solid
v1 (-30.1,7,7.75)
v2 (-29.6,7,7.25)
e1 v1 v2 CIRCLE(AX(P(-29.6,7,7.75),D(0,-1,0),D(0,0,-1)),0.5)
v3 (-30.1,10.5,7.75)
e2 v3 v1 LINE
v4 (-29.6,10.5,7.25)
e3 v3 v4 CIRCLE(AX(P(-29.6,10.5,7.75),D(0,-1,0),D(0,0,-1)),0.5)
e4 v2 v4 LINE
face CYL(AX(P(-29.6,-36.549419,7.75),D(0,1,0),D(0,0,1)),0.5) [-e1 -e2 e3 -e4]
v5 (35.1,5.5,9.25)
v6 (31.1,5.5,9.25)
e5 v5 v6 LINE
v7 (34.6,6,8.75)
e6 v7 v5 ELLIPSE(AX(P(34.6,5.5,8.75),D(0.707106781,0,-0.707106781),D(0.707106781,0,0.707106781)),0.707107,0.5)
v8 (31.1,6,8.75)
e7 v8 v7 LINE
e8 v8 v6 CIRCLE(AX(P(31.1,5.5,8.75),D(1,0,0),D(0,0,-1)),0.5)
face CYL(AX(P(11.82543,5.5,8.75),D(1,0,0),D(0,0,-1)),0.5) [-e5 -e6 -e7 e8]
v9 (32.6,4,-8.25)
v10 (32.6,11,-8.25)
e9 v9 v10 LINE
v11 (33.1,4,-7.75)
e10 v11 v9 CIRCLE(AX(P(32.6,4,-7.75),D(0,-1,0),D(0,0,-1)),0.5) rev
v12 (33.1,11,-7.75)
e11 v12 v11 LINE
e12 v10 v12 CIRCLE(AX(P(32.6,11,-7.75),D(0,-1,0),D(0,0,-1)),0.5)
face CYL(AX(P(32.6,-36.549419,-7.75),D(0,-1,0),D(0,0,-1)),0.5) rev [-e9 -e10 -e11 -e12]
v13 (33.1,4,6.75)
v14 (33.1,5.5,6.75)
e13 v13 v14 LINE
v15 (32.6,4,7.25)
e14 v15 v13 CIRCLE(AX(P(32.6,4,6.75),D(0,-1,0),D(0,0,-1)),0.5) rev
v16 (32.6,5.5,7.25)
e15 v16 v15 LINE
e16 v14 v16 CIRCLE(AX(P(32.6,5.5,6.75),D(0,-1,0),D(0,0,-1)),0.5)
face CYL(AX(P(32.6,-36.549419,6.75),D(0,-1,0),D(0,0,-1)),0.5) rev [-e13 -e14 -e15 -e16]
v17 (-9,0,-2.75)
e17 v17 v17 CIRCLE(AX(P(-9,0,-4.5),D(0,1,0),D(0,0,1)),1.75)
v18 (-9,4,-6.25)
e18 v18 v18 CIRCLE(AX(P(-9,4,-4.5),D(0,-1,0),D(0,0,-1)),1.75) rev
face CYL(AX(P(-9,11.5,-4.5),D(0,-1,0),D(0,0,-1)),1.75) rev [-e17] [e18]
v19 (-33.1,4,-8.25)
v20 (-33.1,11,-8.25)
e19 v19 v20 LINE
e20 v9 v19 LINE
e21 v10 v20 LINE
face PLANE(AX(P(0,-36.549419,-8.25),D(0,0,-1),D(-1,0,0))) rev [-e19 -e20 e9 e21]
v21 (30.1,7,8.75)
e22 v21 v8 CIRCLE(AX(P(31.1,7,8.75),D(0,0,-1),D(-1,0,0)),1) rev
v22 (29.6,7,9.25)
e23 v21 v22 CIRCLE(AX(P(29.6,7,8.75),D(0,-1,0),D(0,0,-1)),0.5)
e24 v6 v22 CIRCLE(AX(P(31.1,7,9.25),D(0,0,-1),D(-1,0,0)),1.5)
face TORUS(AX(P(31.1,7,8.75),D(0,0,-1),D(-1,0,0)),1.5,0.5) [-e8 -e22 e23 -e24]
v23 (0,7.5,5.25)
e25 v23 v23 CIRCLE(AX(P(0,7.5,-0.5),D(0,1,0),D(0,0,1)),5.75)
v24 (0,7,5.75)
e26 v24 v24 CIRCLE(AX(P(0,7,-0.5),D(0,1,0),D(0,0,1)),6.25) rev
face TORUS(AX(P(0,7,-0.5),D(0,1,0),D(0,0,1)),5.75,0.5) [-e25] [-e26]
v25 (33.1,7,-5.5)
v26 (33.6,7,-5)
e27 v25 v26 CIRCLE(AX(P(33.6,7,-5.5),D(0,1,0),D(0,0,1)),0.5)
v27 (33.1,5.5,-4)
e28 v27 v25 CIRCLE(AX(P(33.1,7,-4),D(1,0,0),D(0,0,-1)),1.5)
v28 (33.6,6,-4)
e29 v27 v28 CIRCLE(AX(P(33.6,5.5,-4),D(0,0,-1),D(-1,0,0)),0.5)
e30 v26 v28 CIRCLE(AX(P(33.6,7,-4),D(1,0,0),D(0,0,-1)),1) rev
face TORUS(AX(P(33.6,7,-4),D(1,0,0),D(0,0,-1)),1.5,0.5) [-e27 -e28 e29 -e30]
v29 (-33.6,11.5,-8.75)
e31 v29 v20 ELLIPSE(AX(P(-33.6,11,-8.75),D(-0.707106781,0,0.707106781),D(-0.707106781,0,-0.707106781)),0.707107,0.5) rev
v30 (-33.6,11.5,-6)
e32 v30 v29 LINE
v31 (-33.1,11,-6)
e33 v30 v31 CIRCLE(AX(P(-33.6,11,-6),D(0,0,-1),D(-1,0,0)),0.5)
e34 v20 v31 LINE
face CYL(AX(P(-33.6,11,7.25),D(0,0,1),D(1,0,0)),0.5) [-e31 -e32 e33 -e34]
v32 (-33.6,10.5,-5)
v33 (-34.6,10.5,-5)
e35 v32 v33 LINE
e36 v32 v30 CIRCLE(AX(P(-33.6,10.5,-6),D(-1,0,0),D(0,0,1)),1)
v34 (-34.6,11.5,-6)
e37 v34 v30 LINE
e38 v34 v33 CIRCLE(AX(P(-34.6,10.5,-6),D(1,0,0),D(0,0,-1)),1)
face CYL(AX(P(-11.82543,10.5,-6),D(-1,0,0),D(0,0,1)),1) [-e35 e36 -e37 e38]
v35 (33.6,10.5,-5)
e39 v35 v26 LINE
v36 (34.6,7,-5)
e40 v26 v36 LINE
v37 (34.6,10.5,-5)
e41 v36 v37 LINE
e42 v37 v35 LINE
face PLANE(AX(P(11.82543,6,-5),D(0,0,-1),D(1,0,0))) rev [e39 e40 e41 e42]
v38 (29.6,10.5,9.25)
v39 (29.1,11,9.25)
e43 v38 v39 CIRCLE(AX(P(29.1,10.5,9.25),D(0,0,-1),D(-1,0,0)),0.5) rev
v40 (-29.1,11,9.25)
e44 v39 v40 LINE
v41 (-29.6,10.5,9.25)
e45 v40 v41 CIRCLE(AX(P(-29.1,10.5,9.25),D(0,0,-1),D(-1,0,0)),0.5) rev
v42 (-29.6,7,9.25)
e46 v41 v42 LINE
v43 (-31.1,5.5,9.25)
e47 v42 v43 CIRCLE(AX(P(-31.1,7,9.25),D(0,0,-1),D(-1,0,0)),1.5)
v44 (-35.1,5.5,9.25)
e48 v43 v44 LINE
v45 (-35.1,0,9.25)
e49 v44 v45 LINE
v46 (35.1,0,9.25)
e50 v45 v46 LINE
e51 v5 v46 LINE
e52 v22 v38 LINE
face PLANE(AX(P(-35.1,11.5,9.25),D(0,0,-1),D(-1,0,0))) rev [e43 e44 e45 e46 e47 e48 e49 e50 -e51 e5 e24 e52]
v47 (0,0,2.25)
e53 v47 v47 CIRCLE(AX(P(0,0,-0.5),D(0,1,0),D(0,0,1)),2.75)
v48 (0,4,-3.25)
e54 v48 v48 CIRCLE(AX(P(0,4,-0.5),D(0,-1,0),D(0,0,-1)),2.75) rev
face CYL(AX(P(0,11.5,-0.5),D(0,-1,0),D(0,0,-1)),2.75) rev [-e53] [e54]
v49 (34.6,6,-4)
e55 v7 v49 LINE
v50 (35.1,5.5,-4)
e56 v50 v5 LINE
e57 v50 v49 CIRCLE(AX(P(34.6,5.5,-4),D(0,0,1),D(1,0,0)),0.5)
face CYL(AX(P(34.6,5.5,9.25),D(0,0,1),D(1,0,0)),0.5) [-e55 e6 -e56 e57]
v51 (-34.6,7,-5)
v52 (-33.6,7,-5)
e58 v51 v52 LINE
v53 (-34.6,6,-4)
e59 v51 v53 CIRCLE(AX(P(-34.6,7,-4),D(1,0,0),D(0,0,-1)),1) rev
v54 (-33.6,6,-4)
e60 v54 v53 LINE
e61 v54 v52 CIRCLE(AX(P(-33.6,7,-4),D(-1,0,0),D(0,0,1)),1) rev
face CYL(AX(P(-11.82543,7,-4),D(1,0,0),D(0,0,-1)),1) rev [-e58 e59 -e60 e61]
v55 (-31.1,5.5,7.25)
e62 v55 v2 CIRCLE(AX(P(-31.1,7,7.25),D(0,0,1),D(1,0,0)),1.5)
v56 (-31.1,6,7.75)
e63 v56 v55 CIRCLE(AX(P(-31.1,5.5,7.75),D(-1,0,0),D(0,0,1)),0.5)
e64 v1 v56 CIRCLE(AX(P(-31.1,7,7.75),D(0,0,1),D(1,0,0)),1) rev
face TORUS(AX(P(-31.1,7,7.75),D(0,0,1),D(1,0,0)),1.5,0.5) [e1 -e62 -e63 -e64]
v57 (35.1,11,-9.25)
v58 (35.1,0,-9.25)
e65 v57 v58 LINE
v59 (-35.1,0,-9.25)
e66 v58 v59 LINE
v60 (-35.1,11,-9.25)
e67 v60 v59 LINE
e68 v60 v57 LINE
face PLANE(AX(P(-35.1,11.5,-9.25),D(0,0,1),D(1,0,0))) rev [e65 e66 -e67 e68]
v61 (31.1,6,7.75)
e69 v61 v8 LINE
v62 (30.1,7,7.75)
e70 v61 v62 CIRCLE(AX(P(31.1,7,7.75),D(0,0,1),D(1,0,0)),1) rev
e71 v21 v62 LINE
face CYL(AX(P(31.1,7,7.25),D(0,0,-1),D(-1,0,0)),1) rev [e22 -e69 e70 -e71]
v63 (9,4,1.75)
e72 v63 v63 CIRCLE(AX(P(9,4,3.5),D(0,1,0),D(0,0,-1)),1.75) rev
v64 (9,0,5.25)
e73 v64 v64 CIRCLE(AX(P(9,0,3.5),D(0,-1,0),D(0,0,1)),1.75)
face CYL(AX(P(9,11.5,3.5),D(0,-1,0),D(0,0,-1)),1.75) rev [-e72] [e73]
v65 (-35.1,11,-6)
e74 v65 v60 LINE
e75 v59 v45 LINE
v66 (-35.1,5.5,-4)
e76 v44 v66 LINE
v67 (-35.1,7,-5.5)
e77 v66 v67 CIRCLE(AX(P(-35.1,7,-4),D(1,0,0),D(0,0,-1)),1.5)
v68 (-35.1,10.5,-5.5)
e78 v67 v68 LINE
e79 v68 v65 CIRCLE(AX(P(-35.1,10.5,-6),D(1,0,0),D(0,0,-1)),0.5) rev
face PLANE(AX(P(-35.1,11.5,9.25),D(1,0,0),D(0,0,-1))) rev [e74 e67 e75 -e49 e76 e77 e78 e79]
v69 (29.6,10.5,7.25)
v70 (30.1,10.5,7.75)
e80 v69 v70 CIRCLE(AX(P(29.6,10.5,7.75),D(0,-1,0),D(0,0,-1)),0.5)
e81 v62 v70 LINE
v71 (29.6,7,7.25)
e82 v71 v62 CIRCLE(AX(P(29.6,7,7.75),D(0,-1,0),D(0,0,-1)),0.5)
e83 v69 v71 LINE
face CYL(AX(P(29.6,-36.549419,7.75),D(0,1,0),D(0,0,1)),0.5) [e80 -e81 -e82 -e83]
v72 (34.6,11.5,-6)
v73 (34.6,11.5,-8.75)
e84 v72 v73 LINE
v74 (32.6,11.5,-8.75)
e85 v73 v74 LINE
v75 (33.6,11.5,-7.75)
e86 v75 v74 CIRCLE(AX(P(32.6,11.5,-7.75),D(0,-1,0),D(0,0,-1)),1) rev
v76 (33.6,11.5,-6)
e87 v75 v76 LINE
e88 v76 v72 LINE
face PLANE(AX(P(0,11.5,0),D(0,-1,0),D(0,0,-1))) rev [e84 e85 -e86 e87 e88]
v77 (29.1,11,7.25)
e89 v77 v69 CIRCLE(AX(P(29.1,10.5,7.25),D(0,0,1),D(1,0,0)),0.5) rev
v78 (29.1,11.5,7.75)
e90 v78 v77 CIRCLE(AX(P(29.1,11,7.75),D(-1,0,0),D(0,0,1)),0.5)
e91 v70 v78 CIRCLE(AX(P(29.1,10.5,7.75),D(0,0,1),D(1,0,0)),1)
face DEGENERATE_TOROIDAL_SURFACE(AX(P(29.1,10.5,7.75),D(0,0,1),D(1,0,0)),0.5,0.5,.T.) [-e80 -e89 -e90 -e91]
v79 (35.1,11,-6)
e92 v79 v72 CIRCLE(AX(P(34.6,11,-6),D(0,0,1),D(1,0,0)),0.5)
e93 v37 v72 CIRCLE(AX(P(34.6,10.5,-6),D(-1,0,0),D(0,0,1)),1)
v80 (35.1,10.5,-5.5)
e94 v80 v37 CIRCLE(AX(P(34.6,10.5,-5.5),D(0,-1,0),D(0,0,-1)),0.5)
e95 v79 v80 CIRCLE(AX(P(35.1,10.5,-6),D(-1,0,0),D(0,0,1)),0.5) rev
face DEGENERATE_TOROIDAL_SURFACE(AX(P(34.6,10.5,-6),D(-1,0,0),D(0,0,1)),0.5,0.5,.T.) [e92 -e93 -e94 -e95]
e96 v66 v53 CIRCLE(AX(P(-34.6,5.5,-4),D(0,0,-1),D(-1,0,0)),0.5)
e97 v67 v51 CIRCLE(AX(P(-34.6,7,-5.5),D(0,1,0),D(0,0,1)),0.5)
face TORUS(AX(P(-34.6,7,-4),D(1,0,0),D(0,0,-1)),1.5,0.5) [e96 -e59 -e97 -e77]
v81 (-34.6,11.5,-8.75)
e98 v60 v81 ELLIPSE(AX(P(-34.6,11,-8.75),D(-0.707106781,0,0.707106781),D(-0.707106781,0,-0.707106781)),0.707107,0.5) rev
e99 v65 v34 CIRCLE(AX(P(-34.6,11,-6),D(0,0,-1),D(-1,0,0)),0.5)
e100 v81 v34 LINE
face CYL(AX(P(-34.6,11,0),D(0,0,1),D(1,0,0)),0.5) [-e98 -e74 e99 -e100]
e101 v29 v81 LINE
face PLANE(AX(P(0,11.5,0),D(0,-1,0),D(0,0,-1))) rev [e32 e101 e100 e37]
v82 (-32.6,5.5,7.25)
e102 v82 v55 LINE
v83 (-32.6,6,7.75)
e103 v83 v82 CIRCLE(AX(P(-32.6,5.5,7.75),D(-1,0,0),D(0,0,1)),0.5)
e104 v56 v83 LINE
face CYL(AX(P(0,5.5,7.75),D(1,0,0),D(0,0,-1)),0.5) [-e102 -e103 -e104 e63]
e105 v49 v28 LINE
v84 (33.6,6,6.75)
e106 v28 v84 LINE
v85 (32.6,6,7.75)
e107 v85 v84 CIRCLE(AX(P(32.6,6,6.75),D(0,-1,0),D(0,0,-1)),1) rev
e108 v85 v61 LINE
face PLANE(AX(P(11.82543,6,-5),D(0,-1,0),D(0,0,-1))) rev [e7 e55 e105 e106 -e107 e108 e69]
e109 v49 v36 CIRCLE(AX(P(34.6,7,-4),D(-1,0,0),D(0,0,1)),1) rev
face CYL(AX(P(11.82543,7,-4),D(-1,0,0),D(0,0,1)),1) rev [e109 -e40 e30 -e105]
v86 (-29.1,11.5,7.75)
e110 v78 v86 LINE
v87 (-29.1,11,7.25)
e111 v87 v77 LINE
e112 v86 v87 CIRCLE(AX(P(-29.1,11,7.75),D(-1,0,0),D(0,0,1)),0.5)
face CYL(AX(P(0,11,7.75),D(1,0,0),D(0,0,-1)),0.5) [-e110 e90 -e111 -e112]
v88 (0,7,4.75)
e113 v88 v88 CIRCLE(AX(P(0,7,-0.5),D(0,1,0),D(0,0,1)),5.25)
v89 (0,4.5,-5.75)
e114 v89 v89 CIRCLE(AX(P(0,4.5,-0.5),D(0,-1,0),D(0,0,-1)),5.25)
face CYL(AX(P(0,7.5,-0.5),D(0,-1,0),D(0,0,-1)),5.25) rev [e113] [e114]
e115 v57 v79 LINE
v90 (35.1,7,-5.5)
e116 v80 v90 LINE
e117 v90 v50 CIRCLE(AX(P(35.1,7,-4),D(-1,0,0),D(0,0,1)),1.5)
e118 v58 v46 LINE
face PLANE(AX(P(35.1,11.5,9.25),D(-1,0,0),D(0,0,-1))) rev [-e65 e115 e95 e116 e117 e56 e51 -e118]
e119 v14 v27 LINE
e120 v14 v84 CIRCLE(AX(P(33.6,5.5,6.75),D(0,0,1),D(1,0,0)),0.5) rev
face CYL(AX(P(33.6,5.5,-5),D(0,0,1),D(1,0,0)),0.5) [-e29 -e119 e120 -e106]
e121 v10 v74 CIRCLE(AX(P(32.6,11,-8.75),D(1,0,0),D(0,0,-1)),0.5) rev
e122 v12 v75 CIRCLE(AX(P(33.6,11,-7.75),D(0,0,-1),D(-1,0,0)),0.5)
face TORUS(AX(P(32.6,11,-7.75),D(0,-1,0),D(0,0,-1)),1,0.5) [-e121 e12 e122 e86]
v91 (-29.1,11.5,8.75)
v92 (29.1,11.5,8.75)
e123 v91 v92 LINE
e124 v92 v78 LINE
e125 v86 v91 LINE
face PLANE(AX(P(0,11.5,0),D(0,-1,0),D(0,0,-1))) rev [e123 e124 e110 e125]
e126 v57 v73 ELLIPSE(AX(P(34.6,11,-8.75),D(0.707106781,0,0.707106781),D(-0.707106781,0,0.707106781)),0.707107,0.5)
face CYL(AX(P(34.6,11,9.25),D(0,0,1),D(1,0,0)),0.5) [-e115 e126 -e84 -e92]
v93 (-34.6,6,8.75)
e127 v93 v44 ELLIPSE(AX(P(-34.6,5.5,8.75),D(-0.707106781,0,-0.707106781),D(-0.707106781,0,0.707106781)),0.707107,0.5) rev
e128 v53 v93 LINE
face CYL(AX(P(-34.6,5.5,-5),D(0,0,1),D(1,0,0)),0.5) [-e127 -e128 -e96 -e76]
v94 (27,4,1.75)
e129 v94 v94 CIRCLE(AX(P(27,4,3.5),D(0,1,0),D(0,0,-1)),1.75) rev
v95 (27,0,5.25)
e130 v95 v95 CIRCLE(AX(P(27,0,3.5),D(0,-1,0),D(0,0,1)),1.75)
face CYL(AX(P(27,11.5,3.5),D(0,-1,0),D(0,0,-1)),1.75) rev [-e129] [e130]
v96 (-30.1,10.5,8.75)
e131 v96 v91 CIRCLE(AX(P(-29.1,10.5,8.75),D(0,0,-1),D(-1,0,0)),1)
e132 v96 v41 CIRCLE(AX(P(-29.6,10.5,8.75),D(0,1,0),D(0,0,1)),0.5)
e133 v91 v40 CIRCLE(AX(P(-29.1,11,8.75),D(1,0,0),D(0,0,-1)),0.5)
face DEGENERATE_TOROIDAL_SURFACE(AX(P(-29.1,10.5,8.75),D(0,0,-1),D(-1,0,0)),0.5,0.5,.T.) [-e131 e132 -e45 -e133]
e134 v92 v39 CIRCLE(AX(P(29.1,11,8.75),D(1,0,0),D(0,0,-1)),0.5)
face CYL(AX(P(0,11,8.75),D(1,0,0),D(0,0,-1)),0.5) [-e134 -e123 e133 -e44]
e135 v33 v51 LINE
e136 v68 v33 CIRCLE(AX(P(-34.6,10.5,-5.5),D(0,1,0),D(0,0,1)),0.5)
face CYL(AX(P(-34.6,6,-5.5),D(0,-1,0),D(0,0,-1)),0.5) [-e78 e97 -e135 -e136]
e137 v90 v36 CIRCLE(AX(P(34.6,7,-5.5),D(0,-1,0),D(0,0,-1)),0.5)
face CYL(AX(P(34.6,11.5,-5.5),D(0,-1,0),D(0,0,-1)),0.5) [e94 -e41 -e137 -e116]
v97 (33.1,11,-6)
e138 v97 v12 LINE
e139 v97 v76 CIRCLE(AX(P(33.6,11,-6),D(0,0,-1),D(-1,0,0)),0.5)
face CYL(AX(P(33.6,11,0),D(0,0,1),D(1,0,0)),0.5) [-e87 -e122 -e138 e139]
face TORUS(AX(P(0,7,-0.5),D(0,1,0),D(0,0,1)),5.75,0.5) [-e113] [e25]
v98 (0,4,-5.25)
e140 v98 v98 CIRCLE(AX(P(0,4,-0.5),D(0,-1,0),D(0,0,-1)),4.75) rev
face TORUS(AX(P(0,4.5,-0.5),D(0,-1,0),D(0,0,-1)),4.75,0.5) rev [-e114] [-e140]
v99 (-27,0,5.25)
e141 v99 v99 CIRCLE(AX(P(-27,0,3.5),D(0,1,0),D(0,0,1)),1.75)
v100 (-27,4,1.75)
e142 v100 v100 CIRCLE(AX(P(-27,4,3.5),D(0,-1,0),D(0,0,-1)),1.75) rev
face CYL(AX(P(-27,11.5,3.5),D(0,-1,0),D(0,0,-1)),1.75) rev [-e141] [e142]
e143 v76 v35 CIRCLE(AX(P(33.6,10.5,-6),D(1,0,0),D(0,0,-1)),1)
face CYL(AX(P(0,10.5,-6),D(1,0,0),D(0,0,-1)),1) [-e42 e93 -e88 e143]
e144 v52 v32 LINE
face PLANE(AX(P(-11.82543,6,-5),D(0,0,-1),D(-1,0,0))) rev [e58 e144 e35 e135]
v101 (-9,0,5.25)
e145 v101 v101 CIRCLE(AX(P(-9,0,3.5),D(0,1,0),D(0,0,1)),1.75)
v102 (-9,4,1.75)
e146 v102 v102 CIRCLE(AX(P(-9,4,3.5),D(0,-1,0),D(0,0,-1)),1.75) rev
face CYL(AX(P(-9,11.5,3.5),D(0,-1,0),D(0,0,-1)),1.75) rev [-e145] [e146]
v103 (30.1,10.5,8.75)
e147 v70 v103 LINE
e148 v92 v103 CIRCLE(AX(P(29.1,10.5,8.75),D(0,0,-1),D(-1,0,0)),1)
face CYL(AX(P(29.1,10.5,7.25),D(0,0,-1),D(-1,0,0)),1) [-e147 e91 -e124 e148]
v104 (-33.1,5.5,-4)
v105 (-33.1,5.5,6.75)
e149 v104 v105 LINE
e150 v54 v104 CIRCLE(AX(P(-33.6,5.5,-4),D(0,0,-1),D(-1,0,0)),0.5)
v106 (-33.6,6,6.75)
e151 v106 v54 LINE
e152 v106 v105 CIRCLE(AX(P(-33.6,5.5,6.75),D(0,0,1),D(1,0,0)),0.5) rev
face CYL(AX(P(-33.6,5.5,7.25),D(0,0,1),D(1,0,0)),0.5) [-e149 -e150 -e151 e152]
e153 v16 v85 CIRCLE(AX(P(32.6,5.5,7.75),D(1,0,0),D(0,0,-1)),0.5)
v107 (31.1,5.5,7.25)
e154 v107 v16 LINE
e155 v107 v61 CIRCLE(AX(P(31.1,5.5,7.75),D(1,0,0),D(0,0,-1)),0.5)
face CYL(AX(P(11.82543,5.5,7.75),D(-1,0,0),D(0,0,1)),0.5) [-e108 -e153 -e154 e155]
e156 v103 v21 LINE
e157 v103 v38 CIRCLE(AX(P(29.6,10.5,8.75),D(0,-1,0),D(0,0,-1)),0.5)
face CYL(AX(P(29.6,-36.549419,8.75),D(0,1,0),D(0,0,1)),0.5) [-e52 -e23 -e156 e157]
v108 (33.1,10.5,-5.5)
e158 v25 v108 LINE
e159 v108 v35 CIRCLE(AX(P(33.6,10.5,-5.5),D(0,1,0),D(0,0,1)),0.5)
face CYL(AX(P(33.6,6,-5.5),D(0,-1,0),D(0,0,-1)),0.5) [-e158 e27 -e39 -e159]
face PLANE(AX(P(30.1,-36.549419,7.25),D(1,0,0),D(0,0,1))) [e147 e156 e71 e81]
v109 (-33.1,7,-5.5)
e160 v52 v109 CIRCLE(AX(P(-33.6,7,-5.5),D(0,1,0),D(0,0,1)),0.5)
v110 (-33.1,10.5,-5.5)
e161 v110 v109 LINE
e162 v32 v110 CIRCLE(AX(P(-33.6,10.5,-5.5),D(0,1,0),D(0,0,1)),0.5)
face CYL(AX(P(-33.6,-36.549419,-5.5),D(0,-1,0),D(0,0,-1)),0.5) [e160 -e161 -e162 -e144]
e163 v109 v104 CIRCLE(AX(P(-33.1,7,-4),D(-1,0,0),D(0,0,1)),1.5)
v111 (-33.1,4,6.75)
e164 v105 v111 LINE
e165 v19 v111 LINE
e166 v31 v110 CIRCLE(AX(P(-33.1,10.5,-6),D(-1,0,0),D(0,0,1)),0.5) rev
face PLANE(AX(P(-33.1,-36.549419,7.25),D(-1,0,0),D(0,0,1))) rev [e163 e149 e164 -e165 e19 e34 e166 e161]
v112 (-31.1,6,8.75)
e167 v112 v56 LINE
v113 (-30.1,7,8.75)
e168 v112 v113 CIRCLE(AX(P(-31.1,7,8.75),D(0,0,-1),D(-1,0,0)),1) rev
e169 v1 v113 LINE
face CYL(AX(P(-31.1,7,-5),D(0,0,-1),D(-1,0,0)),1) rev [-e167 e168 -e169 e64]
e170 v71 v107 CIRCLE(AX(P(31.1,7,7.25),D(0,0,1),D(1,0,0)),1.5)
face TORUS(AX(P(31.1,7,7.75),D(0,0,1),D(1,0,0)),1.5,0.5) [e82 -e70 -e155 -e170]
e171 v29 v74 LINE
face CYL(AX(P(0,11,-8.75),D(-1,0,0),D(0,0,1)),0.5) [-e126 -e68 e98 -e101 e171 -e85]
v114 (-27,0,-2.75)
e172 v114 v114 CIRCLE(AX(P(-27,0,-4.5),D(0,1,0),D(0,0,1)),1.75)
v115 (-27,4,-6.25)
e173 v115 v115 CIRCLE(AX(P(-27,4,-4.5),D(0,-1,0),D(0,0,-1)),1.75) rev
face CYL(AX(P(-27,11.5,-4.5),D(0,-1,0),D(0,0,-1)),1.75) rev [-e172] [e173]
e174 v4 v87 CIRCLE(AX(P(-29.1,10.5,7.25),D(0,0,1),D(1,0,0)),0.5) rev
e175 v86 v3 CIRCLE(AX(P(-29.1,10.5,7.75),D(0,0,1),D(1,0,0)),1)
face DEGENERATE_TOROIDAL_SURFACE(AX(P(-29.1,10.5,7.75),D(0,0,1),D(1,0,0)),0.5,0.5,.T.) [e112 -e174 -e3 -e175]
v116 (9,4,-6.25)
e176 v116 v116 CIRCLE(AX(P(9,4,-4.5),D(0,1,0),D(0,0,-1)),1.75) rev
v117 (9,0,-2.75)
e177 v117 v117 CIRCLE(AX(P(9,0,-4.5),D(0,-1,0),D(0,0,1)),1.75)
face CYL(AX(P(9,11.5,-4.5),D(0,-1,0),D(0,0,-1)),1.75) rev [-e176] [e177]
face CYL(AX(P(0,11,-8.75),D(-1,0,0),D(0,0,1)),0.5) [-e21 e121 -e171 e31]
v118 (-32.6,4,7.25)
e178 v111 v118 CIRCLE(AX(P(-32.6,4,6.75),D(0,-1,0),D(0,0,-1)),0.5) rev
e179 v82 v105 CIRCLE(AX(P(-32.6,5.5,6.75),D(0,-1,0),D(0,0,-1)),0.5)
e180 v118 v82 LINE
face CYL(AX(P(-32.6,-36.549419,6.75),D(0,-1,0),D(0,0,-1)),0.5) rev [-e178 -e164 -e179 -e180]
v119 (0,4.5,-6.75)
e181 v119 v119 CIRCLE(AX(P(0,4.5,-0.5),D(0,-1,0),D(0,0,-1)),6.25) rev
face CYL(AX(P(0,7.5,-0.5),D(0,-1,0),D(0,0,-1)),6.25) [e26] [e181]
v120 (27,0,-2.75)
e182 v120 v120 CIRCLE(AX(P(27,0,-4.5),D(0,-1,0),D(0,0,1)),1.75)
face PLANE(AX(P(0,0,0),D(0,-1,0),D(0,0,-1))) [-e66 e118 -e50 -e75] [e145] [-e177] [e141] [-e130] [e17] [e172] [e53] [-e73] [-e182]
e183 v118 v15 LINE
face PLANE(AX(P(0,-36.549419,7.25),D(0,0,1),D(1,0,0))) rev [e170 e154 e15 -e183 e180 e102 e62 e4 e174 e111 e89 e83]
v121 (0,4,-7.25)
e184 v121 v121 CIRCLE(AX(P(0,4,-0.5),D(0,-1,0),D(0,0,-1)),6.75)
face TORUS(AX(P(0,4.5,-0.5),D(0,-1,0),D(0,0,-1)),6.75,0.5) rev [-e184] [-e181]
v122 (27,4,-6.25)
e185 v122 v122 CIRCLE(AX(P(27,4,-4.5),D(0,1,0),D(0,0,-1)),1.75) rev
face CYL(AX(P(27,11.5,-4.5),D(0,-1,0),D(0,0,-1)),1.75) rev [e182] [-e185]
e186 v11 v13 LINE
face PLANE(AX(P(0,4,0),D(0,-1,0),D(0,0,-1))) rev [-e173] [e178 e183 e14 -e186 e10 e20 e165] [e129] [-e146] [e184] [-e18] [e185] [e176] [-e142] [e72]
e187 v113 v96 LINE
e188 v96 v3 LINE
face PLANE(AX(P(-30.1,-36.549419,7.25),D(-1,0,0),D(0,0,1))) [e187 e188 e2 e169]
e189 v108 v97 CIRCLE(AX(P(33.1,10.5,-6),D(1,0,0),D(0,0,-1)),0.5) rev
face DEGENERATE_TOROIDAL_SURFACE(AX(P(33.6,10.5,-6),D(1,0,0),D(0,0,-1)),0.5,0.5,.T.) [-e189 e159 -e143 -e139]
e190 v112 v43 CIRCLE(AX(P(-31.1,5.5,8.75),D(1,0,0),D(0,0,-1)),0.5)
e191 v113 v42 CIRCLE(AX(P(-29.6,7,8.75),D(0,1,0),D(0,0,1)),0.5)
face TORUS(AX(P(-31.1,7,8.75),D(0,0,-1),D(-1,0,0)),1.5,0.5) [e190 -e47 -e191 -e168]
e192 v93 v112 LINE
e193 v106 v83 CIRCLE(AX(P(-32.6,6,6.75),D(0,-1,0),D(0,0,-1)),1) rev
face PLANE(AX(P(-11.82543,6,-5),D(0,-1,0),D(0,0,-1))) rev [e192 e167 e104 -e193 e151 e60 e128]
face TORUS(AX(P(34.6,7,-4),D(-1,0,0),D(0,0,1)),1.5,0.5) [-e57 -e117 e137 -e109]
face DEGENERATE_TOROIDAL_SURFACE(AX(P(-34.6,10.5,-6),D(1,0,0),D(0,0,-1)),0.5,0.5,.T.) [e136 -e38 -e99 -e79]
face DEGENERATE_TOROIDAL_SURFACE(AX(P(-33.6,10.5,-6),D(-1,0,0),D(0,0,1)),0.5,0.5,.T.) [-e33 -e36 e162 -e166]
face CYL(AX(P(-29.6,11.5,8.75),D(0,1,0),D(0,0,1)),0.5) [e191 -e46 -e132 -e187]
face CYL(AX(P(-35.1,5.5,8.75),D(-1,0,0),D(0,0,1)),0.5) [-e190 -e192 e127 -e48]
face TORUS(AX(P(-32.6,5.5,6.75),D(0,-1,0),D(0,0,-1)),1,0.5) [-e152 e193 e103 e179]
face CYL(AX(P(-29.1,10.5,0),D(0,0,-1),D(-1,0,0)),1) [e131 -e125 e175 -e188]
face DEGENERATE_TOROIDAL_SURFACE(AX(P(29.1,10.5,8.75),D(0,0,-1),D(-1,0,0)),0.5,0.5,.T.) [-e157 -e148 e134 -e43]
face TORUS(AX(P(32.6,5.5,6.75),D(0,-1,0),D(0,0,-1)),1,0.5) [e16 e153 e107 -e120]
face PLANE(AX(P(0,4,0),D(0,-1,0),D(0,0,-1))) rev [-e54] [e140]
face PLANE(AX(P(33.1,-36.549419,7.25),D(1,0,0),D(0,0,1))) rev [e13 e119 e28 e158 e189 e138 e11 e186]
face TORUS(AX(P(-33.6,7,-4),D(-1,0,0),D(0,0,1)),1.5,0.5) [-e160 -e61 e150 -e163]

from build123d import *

# Parameters (mm, degrees)
SKETCH1_W           = 35.1
SKETCH1_H           = 18.5
BOSS_EXTRUDE1_DEPTH = 11.5
SKETCH7_W           = 33.1
SKETCH7_H           = 15.5
CUT_EXTRUDE5_DEPTH  = 7.5
SKETCH2_R           = 1.75
CUT_EXTRUDE1_DEPTH  = 39.076534769
SKETCH4_W           = 14.25
SKETCH4_H           = 5.5
CUT_EXTRUDE3_DEPTH  = 5
SKETCH5_R           = 2.75
CUT_EXTRUDE4_DEPTH  = 39.076534769
SKETCH6_R           = 6.25
SKETCH6_R_2         = 5.25
BOSS_EXTRUDE2_DEPTH = 3.5
FILLET3_R           = 1
FILLET4_R           = 0.5
FILLET5_R           = 0.5


with BuildPart() as part:
    # Sketch1 → Boss-Extrude1 (new body)
    with BuildSketch(Plane(origin=(0, 0, 0), x_dir=(1, 0, 0), z_dir=(0, 1, 0))):
        with Locations((-17.55, 0)):
            Rectangle(SKETCH1_W, SKETCH1_H)
    extrude(amount=BOSS_EXTRUDE1_DEPTH)

    # Sketch7 → Cut-Extrude5 (cut)
    with BuildSketch(Plane(origin=(0, 11.5, 0), x_dir=(1, 0, 0), z_dir=(0, 1, 0))):
        with Locations((-16.55, 0.5)):
            Rectangle(SKETCH7_W, SKETCH7_H)
    extrude(amount=-CUT_EXTRUDE5_DEPTH, mode=Mode.SUBTRACT)

    # Sketch2 → Cut-Extrude1 (cut, through all)
    with BuildSketch(Plane(origin=(0, 0, 0), x_dir=(-1, 0, 0), z_dir=(0, 1, 0))):
        with Locations(Location((27, 3.5, 0), (0, 0, 270))):
            Circle(SKETCH2_R)
        with Locations(Location((9, 3.5, 0), (0, 0, 270))):
            Circle(SKETCH2_R)
        with Locations(Location((27, -4.5, 0), (0, 0, 270))):
            Circle(SKETCH2_R)
        with Locations(Location((9, -4.5, 0), (0, 0, 270))):
            Circle(SKETCH2_R)
    extrude(amount=CUT_EXTRUDE1_DEPTH, mode=Mode.SUBTRACT)

    # Sketch4 → Cut-Extrude3 (cut)
    with BuildSketch(Plane.ZY.offset(35.1)):
        with Locations((2.125, 8.75)):
            Rectangle(SKETCH4_W, SKETCH4_H)
    extrude(amount=-CUT_EXTRUDE3_DEPTH, mode=Mode.SUBTRACT)

    # Mirror1: part across plane


with BuildPart() as part_1:
    add(part.part)
    add(part.part.mirror(Plane(origin=(0, 0, 0), x_dir=(0, 0, 1), z_dir=(1, 0, 0))))

    # Sketch5 → Cut-Extrude4 (cut, through all)
    with BuildSketch(Plane(origin=(0, 0, 0), x_dir=(1, 0, 0), z_dir=(0, 1, 0))):
        with Locations(Location((0, 0.5, 0), (0, 0, 90))):
            Circle(SKETCH5_R)
    extrude(amount=CUT_EXTRUDE4_DEPTH, mode=Mode.SUBTRACT)

    # Sketch6 → Boss-Extrude2 (add)
    with BuildSketch(Plane(origin=(0, 4, 0), x_dir=(1, 0, 0), z_dir=(0, 1, 0))):
        with Locations(Location((0, 0.5, 0), (0, 0, 90))):
            Circle(SKETCH6_R)
        with Locations(Location((0, 0.5, 0), (0, 0, 270))):
            Circle(SKETCH6_R_2, mode=Mode.SUBTRACT)
    extrude(amount=BOSS_EXTRUDE2_DEPTH)

    # Fillet3
    fillet3_edges = [part_1.edges().sort_by_distance(p)[0] for p in [
        (-34.1, 6, -5),
        (-34.1, 11.5, -5),
        (-30.1, 11.5, 8.25),
        (-30.1, 6, 8.25),
        (34.1, 11.5, -5),
        (34.1, 6, -5),
        (30.1, 11.5, 8.25),
        (30.1, 6, 8.25),
    ]]
    fillet(fillet3_edges, radius=FILLET3_R)

    # Fillet4
    fillet4_edges = [part_1.edges().sort_by_distance(p)[0] for p in [
        (0, 4, 5.75),
        (0, 4, -5.75),
    ]]
    fillet(fillet4_edges, radius=FILLET4_R)
    fillet4_2_edges = [part_1.edges().sort_by_distance(p)[0] for p in [
        (0, 7.5, 5.75),
        (0, 7.5, -5.75),
    ]]
    fillet(fillet4_2_edges, radius=FILLET4_R - 0.0001)  # a hair under: the kernel refuses the full size

    # Fillet5
    fillet5_edges = [part_1.edges().sort_by_distance(p)[0] for p in [
        (30.1, 8.75, 7.25),
        (30.1, 8.75, 9.25),
        (-30.1, 8.75, 9.25),
        (-33.1, 6, 9.25),
        (33.1, 6, 9.25),
        (0, 11.5, 9.25),
        (-29.807106781, 11.207106781, 9.25),
        (29.807106781, 11.207106781, 9.25),
        (0, 11.5, 7.25),
        (-30.1, 8.75, 7.25),
        (-29.807106781, 11.207106781, 7.25),
        (29.807106781, 11.207106781, 7.25),
        (33.1, 6, 1.625),
        (35.1, 6, 2.625),
        (-35.1, 6, 2.625),
        (-33.1, 6, 1.625),
        (-35.1, 11.5, -7.625),
        (35.1, 8.75, -5),
        (35.1, 11.207106781, -5.292893219),
        (33.1, 8.75, -5),
        (33.1, 11.207106781, -5.292893219),
        (-35.1, 8.75, -5),
        (-33.1, 8.75, -5),
        (-35.1, 11.207106781, -5.292893219),
        (-33.1, 11.207106781, -5.292893219),
        (30.392893219, 6.292893219, 7.25),
        (30.392893219, 6.292893219, 9.25),
        (-30.392893219, 6.292893219, 7.25),
        (-30.392893219, 6.292893219, 9.25),
        (35.1, 6.292893219, -4.707106781),
        (33.1, 6.292893219, -4.707106781),
        (-35.1, 6.292893219, -4.707106781),
        (-33.1, 6.292893219, -4.707106781),
        (0, 11.5, -8.25),
        (-33.1, 11.5, -7.125),
        (-33.1, 5, 7.25),
        (-32.1, 6, 7.25),
        (35.1, 11.5, -7.625),
        (33.1, 11.5, -7.125),
        (33.1, 7.75, -8.25),
        (33.1, 5, 7.25),
        (32.1, 6, 7.25),
        (0, 11.5, -9.25),
    ]]
    fillet(fillet5_edges, radius=FILLET5_R - 0.0001)  # a hair under: the kernel refuses the full size


solid = part_1.part
